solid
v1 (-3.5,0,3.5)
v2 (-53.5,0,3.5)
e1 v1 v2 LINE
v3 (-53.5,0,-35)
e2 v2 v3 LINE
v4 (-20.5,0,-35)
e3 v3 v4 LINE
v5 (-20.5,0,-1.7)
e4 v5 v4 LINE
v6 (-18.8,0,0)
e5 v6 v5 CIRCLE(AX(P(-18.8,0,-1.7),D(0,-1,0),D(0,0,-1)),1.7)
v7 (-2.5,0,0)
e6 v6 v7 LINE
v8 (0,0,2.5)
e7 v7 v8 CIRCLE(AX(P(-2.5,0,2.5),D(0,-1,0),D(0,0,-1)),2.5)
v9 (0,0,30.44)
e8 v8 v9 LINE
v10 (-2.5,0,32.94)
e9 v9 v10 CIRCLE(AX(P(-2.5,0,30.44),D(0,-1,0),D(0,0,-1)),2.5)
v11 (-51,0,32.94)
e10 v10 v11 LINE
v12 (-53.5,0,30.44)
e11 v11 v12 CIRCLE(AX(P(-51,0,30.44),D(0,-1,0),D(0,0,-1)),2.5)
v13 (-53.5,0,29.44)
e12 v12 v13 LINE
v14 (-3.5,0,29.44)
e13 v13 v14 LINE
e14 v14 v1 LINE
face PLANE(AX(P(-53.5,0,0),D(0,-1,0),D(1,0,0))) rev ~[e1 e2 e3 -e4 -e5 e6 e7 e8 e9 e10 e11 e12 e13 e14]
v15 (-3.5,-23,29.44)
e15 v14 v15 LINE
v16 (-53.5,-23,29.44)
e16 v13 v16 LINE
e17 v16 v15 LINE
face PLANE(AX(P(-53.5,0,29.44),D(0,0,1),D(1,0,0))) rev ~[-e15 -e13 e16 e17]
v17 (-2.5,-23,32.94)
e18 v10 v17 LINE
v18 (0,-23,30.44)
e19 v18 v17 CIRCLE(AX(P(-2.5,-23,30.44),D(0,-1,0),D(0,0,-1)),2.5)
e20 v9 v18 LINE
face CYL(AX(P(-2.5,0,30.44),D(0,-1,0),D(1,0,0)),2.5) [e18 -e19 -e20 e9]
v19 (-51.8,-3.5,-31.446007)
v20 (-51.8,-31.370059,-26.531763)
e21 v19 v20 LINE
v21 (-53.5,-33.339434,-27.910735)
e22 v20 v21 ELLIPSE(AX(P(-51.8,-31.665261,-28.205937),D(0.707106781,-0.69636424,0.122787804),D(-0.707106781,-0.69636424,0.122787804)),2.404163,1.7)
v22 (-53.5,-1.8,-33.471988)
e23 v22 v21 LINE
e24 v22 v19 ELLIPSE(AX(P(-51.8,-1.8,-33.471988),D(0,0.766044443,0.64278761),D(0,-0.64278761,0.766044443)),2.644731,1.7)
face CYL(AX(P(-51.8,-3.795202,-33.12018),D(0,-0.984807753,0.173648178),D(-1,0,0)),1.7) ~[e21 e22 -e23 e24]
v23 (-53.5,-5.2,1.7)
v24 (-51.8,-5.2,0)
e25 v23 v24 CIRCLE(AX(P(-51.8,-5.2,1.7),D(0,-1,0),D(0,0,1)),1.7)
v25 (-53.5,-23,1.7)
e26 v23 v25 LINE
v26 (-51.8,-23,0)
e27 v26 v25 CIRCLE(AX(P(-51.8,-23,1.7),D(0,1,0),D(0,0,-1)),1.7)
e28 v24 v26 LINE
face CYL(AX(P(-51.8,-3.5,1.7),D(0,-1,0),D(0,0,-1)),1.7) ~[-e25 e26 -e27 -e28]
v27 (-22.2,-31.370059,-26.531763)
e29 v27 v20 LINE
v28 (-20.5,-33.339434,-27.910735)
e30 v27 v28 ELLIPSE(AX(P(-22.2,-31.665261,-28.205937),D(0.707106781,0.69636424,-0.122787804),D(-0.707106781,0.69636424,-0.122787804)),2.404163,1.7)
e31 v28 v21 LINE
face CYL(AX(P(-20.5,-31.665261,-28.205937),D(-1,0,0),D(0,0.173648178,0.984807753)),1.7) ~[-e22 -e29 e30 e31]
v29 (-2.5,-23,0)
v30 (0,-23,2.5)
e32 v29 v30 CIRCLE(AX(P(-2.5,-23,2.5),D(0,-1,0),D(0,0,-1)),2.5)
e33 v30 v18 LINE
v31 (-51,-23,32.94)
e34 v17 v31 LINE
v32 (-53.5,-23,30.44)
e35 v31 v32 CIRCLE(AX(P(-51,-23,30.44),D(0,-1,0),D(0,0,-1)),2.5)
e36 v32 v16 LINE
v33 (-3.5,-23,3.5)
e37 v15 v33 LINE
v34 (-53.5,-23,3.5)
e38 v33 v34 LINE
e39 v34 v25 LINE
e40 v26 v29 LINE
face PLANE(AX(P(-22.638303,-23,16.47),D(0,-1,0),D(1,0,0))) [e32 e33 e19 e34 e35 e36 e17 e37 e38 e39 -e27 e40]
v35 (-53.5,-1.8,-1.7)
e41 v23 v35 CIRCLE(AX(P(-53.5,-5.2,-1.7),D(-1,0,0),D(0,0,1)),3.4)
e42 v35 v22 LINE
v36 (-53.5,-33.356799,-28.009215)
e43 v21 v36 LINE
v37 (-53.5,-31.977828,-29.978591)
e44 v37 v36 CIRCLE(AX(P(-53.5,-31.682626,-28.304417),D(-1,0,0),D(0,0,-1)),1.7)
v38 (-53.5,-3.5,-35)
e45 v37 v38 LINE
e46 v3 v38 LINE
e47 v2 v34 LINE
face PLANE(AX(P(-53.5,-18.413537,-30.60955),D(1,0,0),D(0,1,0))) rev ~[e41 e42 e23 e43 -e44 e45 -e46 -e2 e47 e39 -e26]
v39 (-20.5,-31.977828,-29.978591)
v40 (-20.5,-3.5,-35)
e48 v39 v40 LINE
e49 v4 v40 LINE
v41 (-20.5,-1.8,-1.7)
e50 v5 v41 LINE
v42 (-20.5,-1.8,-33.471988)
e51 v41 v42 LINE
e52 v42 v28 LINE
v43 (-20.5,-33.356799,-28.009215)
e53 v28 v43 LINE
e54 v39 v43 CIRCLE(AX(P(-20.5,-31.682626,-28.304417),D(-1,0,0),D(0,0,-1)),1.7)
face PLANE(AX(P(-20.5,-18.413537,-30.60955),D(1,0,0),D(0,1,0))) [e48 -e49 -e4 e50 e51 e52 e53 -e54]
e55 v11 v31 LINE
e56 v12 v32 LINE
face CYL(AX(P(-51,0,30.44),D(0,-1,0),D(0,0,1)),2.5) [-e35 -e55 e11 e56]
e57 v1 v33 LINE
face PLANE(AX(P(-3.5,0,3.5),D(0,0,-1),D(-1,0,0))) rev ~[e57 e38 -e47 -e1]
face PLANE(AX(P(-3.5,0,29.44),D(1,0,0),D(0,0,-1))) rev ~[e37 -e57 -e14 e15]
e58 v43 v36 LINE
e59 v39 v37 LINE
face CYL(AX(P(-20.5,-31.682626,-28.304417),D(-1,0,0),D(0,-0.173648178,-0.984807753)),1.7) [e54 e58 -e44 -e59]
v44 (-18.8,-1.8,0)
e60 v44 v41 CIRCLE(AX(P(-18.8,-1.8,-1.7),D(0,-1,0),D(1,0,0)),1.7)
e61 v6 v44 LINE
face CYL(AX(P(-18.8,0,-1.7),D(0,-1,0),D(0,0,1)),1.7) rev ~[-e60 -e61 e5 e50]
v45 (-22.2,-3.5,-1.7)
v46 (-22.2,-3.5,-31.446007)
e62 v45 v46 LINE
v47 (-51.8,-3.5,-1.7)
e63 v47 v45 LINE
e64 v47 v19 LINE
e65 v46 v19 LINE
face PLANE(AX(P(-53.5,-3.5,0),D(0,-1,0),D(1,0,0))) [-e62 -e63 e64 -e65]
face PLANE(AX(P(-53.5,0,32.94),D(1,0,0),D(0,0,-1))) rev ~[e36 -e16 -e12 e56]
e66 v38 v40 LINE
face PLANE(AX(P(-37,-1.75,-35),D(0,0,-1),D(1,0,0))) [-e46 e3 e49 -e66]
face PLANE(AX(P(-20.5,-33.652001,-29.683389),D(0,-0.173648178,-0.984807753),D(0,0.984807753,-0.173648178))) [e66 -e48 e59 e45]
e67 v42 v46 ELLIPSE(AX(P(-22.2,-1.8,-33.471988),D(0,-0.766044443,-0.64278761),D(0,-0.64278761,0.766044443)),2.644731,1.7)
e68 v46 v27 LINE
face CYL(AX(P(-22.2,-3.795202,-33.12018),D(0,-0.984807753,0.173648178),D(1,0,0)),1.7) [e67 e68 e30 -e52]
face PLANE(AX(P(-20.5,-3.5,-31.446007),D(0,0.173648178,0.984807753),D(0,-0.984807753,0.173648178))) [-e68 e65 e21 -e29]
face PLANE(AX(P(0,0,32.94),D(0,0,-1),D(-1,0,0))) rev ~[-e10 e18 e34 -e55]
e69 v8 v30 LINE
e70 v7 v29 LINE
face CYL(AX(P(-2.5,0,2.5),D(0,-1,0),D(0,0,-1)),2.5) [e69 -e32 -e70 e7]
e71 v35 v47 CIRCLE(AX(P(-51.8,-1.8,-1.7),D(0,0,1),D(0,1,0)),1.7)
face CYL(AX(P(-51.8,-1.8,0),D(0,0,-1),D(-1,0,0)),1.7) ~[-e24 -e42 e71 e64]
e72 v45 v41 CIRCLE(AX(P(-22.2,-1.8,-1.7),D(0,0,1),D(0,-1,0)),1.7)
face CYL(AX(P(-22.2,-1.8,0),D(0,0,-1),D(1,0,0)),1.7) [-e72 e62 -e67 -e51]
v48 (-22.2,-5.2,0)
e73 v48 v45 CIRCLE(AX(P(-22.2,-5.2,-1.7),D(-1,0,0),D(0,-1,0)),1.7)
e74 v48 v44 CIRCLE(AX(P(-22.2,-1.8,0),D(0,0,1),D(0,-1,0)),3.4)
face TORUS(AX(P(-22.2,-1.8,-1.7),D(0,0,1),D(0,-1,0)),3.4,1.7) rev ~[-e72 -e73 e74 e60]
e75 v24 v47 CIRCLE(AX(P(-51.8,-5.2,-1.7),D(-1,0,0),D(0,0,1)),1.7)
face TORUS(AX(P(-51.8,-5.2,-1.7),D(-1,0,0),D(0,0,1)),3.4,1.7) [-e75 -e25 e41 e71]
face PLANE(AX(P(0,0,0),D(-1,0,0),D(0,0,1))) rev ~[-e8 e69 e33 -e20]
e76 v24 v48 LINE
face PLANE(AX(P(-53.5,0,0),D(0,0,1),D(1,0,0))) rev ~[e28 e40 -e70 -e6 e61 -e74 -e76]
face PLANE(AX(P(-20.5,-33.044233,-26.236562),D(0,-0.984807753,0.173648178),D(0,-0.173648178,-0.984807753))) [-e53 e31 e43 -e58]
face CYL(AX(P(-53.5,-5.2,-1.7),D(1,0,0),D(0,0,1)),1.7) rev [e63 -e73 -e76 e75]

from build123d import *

# Parameters (mm, degrees)
F1_DEPTH = 23
F2_W     = 33
F2_H     = 3.5
F3_DEPTH = 35
F5_DEPTH = 33
F6_R     = 2.5
F7_R     = 1.7


with BuildPart() as f1:
    # F0 (on Front) → F1 (new body)
    with BuildSketch(Plane.XZ):
        Polygon((-53.5, 32.94), (-53.5, 29.44), (-3.5, 29.44), (-3.5, 3.5), (-53.5, 3.5), (-53.5, 0), (0, 0), (0, 32.94), align=None)
    extrude(amount=F1_DEPTH)

    # F2 (on face) → F3 (join)
    with BuildSketch(Plane(origin=(0, 0, 0), x_dir=(1, 0, 0), z_dir=(0, 0, -1))):
        with Locations((-37, 1.75)):
            Rectangle(F2_W, F2_H)
    extrude(amount=F3_DEPTH)

    # F4 (on face) → F5 (join, through all)
    with BuildSketch(Plane.YZ.offset(-20.5)):
        Polygon((-33.6520012122, -29.6833886639), (-3.5, -35), (-3.5, -31.4460068584), (-33.0442325904, -26.2365615284), align=None)
    extrude(amount=-F5_DEPTH)

    # F6
    f6_edges = [f1.edges().sort_by_distance(p)[0] for p in [
        (-53.5, -11.5, 32.94),
        (0, -11.5, 32.94),
        (0, -11.5, 0),
    ]]
    fillet(f6_edges, radius=F6_R)

    # F7
    f7_edges = [f1.edges().sort_by_distance(p)[0] for p in [
        (-37, -33.652001, -29.683389),
        (-37, -33.044233, -26.236562),
        (-20.5, -18.272116, -28.841284),
        (-53.5, -18.272116, -28.841284),
        (-20.5, -3.5, -15.723003),
        (-37, -3.5, 0),
        (-53.5, -13.25, 0),
        (-53.5, -3.5, -15.723003),
        (-20.5, -1.75, 0),
    ]]
    fillet(f7_edges, radius=F7_R)


solid = f1.part
